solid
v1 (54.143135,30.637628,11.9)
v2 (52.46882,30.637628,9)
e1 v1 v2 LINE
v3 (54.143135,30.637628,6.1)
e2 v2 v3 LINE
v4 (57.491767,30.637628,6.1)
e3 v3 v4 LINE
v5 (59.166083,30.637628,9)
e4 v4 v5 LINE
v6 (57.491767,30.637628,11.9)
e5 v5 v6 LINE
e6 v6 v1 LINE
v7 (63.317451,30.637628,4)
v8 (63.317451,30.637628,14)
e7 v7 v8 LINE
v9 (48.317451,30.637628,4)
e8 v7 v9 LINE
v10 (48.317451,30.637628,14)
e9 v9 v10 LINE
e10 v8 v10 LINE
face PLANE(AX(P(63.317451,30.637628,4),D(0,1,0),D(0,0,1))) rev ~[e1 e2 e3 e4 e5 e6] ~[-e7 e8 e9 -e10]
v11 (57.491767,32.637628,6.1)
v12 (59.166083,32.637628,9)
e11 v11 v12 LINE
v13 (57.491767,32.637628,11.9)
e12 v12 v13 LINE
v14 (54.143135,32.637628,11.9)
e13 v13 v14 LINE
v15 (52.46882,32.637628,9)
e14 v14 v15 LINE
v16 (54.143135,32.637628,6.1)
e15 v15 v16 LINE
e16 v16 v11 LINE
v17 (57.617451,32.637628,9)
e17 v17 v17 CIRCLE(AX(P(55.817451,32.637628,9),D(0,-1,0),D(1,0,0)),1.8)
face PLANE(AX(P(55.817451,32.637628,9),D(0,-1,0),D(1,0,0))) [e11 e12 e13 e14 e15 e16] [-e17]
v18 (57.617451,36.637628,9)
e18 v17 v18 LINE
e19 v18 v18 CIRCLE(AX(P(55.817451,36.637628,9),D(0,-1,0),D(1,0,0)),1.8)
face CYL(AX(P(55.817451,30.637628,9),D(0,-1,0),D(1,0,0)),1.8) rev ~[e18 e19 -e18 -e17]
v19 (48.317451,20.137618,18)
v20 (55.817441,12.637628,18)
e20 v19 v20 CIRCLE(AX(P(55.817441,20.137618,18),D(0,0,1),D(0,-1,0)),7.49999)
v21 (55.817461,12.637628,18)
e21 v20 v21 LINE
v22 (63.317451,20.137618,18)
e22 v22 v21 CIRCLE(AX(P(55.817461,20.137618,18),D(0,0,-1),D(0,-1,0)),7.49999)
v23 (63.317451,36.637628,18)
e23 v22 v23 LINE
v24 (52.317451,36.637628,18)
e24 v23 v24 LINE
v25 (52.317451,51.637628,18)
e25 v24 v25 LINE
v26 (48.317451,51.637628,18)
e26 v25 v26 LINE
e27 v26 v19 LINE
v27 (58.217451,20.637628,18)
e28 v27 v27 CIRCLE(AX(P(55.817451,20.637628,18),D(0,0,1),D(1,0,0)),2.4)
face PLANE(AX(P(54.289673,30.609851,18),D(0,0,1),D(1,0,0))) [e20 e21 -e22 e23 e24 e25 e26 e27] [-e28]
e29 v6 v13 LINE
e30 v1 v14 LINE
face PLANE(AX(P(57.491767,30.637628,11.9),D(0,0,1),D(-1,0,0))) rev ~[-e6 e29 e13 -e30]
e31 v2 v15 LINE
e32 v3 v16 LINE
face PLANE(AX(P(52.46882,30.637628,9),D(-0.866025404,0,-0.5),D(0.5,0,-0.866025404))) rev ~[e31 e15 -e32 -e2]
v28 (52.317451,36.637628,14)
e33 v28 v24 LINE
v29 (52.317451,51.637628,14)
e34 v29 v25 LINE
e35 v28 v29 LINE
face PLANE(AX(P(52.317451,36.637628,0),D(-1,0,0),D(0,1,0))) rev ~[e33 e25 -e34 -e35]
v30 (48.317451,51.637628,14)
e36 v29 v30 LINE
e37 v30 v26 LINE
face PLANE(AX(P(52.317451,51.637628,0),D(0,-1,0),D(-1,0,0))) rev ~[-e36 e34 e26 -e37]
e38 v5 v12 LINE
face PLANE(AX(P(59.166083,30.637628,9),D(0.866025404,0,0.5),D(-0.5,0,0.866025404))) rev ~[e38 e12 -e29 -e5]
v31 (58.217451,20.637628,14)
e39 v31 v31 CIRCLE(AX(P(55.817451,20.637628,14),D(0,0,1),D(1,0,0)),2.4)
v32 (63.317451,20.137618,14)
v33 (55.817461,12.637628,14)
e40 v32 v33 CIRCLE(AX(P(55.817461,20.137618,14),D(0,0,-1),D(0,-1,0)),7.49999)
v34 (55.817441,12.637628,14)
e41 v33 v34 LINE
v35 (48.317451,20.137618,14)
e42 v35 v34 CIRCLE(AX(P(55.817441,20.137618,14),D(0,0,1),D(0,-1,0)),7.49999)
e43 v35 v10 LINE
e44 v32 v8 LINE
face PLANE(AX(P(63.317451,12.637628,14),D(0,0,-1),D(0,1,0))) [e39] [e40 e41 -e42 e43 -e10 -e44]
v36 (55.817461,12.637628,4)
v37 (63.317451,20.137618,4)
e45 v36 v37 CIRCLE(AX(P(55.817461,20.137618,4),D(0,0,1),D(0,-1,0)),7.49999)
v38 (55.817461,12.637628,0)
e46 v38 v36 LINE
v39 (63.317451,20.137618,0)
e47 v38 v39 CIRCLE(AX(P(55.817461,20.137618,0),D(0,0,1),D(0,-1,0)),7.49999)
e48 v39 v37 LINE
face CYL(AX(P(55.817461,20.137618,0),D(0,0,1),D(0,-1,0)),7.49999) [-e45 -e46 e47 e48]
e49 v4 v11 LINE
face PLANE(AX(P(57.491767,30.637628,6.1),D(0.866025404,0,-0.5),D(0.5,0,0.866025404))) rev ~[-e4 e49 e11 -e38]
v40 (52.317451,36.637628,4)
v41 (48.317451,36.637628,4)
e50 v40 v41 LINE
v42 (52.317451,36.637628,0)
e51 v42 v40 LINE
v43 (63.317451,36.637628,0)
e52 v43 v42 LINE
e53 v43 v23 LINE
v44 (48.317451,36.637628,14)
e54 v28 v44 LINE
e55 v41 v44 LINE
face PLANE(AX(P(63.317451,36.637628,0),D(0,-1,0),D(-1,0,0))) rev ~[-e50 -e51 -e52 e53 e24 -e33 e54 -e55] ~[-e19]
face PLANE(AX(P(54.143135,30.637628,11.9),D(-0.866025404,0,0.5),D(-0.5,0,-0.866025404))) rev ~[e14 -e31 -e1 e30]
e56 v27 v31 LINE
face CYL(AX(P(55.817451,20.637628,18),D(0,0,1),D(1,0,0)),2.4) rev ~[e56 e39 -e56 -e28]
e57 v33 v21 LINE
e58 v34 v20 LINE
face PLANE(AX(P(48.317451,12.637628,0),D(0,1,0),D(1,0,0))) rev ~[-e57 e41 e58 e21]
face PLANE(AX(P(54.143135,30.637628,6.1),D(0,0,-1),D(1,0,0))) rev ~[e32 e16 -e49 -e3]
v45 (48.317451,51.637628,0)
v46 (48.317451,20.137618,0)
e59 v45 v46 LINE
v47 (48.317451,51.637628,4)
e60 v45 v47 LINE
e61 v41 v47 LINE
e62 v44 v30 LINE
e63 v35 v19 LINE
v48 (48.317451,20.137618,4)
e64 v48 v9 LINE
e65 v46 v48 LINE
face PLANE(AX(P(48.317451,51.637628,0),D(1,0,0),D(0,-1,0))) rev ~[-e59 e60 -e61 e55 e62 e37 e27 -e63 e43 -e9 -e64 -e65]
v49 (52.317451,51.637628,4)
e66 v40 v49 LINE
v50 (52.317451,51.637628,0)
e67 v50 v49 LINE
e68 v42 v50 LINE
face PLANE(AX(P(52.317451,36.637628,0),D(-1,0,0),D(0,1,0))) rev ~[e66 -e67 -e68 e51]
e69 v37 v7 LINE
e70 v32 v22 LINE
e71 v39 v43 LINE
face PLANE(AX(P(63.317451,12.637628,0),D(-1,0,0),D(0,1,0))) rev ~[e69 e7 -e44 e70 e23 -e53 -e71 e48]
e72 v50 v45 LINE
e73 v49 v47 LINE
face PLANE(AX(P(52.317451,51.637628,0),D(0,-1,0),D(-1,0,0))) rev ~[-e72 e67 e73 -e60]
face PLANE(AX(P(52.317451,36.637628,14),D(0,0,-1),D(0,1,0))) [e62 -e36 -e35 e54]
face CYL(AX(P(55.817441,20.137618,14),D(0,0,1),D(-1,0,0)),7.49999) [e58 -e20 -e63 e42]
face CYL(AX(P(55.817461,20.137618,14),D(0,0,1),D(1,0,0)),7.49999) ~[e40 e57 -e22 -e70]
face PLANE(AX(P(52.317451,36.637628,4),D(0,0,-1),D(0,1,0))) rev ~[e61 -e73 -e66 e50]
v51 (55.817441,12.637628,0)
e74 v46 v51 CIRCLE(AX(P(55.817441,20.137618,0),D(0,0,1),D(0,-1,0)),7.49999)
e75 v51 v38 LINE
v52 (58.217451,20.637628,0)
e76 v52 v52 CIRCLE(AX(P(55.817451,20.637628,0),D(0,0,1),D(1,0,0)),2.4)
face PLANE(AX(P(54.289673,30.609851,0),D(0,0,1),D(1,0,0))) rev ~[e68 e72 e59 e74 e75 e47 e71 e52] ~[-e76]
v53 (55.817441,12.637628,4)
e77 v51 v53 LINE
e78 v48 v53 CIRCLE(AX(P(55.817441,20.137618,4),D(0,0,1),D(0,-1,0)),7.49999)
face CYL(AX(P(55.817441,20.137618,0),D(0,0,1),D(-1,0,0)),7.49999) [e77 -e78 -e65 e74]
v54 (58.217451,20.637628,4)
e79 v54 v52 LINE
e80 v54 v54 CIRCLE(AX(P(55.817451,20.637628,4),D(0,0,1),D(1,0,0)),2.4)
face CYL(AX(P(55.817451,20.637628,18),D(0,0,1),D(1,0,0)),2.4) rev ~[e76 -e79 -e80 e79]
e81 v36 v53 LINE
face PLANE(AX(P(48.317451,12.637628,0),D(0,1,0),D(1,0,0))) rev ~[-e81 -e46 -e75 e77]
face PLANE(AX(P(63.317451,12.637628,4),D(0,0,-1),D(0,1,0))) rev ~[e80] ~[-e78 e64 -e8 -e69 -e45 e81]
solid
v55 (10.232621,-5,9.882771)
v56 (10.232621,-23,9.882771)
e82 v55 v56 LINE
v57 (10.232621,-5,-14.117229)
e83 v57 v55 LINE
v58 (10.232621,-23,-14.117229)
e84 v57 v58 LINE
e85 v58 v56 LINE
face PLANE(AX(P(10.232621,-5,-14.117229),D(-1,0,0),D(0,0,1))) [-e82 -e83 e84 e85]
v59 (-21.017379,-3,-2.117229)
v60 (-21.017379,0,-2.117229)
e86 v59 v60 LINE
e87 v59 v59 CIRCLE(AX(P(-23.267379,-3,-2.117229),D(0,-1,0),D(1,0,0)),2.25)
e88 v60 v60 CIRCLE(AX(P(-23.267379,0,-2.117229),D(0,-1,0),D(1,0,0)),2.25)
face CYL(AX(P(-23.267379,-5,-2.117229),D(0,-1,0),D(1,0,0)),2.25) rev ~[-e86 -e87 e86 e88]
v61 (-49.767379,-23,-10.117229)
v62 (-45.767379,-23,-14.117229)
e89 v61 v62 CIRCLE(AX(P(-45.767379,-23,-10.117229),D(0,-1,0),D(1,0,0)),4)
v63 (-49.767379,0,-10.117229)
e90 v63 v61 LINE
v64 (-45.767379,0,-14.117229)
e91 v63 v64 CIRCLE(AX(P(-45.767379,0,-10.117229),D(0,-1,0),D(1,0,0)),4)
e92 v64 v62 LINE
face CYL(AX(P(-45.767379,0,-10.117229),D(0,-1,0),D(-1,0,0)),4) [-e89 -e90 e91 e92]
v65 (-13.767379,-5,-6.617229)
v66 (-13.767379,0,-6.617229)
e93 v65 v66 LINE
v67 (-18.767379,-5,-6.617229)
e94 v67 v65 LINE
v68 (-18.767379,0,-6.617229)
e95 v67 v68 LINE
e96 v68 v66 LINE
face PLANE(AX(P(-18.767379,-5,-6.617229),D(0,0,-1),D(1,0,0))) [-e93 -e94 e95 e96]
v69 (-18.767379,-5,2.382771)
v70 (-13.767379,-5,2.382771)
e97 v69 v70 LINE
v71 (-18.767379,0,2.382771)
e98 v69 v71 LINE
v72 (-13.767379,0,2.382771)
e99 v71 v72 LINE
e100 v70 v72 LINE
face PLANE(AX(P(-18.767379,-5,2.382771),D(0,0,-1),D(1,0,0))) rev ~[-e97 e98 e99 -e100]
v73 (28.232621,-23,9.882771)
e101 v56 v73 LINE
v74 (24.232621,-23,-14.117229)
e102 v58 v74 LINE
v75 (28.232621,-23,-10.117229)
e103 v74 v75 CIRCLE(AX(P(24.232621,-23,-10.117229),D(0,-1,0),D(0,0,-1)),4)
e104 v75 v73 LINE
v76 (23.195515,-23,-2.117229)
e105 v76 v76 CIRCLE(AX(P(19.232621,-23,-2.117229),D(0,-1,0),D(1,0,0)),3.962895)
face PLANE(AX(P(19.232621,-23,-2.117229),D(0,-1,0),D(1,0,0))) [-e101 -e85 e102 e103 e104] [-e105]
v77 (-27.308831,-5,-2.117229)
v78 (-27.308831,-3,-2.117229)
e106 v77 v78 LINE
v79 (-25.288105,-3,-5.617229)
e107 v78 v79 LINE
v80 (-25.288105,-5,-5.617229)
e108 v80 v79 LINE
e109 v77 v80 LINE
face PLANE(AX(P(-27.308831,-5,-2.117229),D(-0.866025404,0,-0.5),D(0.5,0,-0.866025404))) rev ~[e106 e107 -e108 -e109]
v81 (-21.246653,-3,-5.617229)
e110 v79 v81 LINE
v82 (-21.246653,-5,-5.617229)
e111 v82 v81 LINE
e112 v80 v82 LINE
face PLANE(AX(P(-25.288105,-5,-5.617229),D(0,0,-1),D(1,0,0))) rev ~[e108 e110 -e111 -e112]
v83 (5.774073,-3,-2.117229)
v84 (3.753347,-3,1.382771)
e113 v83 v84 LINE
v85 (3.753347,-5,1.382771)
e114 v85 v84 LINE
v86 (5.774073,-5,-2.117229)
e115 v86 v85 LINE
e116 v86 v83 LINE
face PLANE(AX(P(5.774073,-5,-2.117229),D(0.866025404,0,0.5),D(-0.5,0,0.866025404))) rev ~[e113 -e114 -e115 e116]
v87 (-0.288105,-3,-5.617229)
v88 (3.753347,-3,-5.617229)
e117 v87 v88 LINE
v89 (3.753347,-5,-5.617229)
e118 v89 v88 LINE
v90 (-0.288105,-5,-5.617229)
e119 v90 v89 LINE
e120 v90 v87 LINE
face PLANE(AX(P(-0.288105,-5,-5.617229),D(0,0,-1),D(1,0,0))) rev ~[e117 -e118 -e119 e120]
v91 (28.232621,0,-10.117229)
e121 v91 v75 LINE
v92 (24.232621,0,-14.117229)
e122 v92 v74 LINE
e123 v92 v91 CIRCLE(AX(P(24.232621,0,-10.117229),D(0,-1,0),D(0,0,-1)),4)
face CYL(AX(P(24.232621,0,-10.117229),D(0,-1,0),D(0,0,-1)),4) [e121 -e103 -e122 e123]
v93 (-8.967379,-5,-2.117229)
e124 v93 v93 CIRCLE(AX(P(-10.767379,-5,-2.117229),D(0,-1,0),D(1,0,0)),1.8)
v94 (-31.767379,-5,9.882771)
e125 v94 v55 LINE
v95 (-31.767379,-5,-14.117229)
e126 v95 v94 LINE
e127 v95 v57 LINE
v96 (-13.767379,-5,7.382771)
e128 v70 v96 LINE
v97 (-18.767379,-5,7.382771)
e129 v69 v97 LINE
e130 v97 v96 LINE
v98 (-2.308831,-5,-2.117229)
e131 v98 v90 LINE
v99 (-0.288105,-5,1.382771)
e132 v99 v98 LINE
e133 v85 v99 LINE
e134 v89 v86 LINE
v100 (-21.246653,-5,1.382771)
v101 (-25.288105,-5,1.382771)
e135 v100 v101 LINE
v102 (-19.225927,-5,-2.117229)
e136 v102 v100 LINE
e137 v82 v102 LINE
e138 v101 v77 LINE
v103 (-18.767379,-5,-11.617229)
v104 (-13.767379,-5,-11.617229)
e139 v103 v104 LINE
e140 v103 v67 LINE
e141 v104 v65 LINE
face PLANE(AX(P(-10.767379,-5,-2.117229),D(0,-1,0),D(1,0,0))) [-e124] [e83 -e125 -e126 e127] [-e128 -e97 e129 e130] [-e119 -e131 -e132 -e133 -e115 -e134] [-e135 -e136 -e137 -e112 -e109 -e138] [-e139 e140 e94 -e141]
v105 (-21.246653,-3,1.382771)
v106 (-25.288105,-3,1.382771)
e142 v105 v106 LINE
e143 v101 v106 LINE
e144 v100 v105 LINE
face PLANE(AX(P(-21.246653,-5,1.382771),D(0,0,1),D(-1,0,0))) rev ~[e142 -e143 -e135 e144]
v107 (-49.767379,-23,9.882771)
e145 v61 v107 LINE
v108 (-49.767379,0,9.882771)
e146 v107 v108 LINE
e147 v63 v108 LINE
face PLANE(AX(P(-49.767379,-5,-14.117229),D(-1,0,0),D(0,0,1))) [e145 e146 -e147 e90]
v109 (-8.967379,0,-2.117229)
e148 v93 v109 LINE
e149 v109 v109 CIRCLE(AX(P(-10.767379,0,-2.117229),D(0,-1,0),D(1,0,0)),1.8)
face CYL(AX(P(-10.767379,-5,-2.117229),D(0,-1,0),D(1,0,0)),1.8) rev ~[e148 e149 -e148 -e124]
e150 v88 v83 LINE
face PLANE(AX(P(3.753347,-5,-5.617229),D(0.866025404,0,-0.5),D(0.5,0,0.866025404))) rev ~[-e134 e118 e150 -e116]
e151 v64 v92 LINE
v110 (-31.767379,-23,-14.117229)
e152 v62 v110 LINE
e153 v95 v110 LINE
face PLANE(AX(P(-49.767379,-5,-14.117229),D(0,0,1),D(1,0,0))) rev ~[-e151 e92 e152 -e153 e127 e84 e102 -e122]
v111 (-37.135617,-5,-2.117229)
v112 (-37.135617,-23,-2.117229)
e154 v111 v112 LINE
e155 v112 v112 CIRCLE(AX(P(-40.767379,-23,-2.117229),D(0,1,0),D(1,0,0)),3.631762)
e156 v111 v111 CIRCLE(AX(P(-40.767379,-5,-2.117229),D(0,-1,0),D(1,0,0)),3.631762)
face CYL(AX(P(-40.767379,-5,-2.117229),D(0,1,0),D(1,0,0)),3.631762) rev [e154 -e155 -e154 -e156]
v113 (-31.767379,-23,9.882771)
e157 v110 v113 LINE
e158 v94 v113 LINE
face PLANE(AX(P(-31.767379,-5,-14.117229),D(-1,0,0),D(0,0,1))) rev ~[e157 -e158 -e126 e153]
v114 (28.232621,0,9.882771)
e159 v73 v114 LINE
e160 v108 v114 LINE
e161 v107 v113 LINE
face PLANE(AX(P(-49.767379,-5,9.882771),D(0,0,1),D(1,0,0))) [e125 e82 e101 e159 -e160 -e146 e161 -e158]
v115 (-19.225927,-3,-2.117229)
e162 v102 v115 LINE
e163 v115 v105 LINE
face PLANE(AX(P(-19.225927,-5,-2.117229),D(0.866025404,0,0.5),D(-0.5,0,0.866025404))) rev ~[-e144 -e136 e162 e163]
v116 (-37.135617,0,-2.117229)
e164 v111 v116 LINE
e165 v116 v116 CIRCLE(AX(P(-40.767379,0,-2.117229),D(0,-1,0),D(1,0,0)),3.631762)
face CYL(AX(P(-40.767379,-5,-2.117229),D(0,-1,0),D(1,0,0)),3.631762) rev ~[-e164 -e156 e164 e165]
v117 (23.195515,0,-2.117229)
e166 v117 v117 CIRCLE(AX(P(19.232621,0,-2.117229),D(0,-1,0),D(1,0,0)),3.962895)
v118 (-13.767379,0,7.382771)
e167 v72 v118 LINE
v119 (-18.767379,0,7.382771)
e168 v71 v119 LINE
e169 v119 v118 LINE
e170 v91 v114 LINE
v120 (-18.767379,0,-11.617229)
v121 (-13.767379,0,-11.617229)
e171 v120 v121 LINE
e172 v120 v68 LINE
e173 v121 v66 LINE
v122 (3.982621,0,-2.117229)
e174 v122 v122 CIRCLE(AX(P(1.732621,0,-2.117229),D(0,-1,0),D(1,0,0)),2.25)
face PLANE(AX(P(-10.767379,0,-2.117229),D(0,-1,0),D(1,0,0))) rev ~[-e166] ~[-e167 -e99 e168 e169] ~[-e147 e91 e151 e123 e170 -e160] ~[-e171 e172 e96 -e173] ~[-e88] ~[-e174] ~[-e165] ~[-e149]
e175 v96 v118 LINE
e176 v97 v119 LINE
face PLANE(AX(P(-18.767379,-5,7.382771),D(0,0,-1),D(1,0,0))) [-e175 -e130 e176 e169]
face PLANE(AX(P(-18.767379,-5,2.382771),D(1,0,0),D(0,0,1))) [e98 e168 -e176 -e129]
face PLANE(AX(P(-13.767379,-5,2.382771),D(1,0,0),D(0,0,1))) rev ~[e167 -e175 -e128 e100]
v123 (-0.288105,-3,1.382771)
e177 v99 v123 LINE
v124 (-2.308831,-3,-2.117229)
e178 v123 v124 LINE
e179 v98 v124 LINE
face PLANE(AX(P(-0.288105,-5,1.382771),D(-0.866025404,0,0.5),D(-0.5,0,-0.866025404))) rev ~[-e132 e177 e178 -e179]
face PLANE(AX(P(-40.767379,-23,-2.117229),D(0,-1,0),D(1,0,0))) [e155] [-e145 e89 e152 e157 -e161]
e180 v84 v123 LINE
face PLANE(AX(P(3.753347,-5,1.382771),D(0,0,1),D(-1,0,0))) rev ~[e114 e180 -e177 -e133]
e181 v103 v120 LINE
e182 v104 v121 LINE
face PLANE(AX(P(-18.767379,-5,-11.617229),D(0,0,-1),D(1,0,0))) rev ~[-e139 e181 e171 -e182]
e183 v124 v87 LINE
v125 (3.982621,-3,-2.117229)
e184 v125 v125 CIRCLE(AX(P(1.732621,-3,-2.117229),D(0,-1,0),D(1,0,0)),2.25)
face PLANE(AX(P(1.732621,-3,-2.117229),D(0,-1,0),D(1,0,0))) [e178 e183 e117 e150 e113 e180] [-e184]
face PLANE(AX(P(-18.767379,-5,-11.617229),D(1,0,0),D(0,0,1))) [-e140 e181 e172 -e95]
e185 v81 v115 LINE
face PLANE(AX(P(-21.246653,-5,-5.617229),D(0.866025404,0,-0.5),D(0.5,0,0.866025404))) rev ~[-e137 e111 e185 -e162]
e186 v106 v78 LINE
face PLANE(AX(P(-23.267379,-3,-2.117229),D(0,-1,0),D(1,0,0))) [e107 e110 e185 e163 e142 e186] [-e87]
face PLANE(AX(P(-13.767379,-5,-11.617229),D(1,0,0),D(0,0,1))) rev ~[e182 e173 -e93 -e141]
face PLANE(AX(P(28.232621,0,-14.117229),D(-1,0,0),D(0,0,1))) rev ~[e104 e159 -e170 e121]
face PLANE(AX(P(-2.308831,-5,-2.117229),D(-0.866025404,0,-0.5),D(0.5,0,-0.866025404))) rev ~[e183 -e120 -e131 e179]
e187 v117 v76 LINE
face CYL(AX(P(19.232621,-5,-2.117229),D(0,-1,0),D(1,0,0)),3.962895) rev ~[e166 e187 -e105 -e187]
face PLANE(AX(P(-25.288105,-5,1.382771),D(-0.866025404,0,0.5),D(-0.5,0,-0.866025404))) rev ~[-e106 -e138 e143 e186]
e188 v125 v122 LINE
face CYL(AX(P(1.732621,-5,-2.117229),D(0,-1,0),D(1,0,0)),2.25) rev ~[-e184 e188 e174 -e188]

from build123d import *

# Parameters (mm, degrees)
F0_W      = 78
F0_H      = 24
F1_DEPTH  = 5
F2_R      = 2.25
F3_DEPTH  = 25
F4_DEPTH  = 2
F5_W      = 5
F5_H      = 5
F6_DEPTH  = 25
F7_W      = 18
F7_H      = 24
F8_DEPTH  = 18
F9_R      = 3.6317619329
F9_R_2    = 3.9628945372
F10_DEPTH = 30
F11_R     = 4
F2_R_2    = 1.8
F12_DEPTH = 25
F14_DEPTH = 18
F15_W     = 15
F15_H     = 10
F16_DEPTH = 25
F17_W     = 18
F17_H     = 10
F18_DEPTH = 25
F19_R     = 2.4
F20_DEPTH = 25
F21_R     = 7.49999
F22_R     = 1.8
F23_DEPTH = 25
F24_DEPTH = 2


# Not quite as in the source:
# - a fillet or chamfer is up to 0.001 mm smaller than in the source, because OpenCascade refuses the exact size


with BuildPart() as f1:
    # F0 (on Front) → F1 (new body)
    with BuildSketch(Plane.XZ):
        with Locations((-10.7673791122, -2.1172289916)):
            Rectangle(F0_W, F0_H)
    extrude(amount=F1_DEPTH)

    # F2 (on face) → F3 (cut)
    with BuildSketch(Plane.XZ.offset(5)):
        with Locations((-23.2673791122, -2.1172289916)):
            Circle(F2_R)
        with Locations((1.7326208878, -2.1172289916)):
            Circle(F2_R)
    extrude(amount=-F3_DEPTH, mode=Mode.SUBTRACT)

    # F2 (on face) → F4 (cut)
    with BuildSketch(Plane.XZ.offset(5)):
        Polygon((-21.24665317, 1.3827710084), (-25.2881050544, 1.3827710084), (-27.3088309965, -2.1172289916), (-25.2881050544, -5.6172289916), (-21.24665317, -5.6172289916), (-19.2259272279, -2.1172289916), align=None)
        with Locations((-23.2673791122, -2.1172289916)):
            Circle(F2_R, mode=Mode.SUBTRACT)
        Polygon((3.75334683, 1.3827710084), (-0.2881050544, 1.3827710084), (-2.3088309965, -2.1172289916), (-0.2881050544, -5.6172289916), (3.75334683, -5.6172289916), (5.7740727721, -2.1172289916), align=None)
        with Locations((1.7326208878, -2.1172289916)):
            Circle(F2_R, mode=Mode.SUBTRACT)
    extrude(amount=-F4_DEPTH, mode=Mode.SUBTRACT)

    # F5 (on face) → F6 (cut)
    with BuildSketch(Plane.XZ.offset(5)):
        with Locations((-16.2673791122, -9.1172289916)):
            Rectangle(F5_W, F5_H)
        with Locations((-16.2673791122, 4.8827710084)):
            Rectangle(F5_W, F5_H)
    extrude(amount=-F6_DEPTH, mode=Mode.SUBTRACT)

    # F7 (on face) → F8 (join)
    with BuildSketch(Plane.XZ.offset(5)):
        with Locations((-40.7673791122, -2.1172289916)):
            Rectangle(F7_W, F7_H)
        with Locations((19.2326208878, -2.1172289916)):
            Rectangle(F7_W, F7_H)
    extrude(amount=F8_DEPTH)

    # F9 (on face) → F10 (cut, symmetric)
    with BuildSketch(Plane.XZ.offset(5)):
        with Locations((-40.7673791122, -2.1172289916)):
            Circle(F9_R)
        with Locations((19.2326208878, -2.1172289916)):
            Circle(F9_R_2)
    extrude(amount=F10_DEPTH, both=True, mode=Mode.SUBTRACT)

    # F11
    f11_edges = [f1.edges().sort_by_distance(p)[0] for p in [
        (-49.767379, -11.5, -14.117229),
        (28.232621, -11.5, -14.117229),
    ]]
    fillet(f11_edges, radius=F11_R)

    # F2 (on face) → F12 (cut)
    with BuildSketch(Plane.XZ.offset(5)):
        with Locations((-10.7673791122, -2.1172289916)):
            Circle(F2_R_2)
    extrude(amount=-F12_DEPTH, mode=Mode.SUBTRACT)


with BuildPart() as f14:
    # F13 (on Top) → F14 (new body)
    with BuildSketch(Plane.XY):
        Polygon((52.3174511414, 51.6376284141), (48.3174511414, 51.6376284141), (48.3174511414, 12.6376284141), (63.3174511414, 12.6376284141), (63.3174511414, 36.6376284141), (52.3174511414, 36.6376284141), align=None)
    extrude(amount=F14_DEPTH)

    # F15 (on face) → F16 (cut)
    with BuildSketch(Plane.YZ.offset(52.3174511414)):
        with Locations((44.1376284141, 9)):
            Rectangle(F15_W, F15_H)
    extrude(amount=-F16_DEPTH, mode=Mode.SUBTRACT)

    # F17 (on face) → F18 (cut)
    with BuildSketch(Plane.YZ.offset(63.3174511414)):
        with Locations((21.6376284141, 9)):
            Rectangle(F17_W, F17_H)
    extrude(amount=-F18_DEPTH, mode=Mode.SUBTRACT)

    # F19 (on face) → F20 (cut)
    with BuildSketch(Plane.XY.offset(18)):
        with Locations((55.8174511414, 20.6376284141)):
            Circle(F19_R)
    extrude(amount=-F20_DEPTH, mode=Mode.SUBTRACT)

    # F21 (radius 7.5 in the source; OpenCascade refuses exactly that, so slightly less here)
    f21_edges = [f14.edges().sort_by_distance(p)[0] for p in [
        (48.317451, 12.637628, 16),
        (48.317451, 12.637628, 2),
        (63.317451, 12.637628, 2),
        (63.317451, 12.637628, 16),
    ]]
    fillet(f21_edges, radius=F21_R)

    # F22 (on face) → F23 (cut)
    with BuildSketch(Plane.XZ.offset(-30.6376284141)):
        with Locations((55.8174511414, 9)):
            Circle(F22_R)
    extrude(amount=-F23_DEPTH, mode=Mode.SUBTRACT)

    # F22 (on face) → F24 (cut)
    with BuildSketch(Plane.XZ.offset(-30.6376284141)):
        Polygon((57.491766922, 11.9), (54.1431353607, 11.9), (52.4688195801, 9), (54.1431353607, 6.1), (57.491766922, 6.1), (59.1660827027, 9), align=None)
        with Locations((55.8174511414, 9)):
            Circle(F22_R, mode=Mode.SUBTRACT)
    extrude(amount=-F24_DEPTH, mode=Mode.SUBTRACT)


solid = Compound([f1.part, f14.part])
